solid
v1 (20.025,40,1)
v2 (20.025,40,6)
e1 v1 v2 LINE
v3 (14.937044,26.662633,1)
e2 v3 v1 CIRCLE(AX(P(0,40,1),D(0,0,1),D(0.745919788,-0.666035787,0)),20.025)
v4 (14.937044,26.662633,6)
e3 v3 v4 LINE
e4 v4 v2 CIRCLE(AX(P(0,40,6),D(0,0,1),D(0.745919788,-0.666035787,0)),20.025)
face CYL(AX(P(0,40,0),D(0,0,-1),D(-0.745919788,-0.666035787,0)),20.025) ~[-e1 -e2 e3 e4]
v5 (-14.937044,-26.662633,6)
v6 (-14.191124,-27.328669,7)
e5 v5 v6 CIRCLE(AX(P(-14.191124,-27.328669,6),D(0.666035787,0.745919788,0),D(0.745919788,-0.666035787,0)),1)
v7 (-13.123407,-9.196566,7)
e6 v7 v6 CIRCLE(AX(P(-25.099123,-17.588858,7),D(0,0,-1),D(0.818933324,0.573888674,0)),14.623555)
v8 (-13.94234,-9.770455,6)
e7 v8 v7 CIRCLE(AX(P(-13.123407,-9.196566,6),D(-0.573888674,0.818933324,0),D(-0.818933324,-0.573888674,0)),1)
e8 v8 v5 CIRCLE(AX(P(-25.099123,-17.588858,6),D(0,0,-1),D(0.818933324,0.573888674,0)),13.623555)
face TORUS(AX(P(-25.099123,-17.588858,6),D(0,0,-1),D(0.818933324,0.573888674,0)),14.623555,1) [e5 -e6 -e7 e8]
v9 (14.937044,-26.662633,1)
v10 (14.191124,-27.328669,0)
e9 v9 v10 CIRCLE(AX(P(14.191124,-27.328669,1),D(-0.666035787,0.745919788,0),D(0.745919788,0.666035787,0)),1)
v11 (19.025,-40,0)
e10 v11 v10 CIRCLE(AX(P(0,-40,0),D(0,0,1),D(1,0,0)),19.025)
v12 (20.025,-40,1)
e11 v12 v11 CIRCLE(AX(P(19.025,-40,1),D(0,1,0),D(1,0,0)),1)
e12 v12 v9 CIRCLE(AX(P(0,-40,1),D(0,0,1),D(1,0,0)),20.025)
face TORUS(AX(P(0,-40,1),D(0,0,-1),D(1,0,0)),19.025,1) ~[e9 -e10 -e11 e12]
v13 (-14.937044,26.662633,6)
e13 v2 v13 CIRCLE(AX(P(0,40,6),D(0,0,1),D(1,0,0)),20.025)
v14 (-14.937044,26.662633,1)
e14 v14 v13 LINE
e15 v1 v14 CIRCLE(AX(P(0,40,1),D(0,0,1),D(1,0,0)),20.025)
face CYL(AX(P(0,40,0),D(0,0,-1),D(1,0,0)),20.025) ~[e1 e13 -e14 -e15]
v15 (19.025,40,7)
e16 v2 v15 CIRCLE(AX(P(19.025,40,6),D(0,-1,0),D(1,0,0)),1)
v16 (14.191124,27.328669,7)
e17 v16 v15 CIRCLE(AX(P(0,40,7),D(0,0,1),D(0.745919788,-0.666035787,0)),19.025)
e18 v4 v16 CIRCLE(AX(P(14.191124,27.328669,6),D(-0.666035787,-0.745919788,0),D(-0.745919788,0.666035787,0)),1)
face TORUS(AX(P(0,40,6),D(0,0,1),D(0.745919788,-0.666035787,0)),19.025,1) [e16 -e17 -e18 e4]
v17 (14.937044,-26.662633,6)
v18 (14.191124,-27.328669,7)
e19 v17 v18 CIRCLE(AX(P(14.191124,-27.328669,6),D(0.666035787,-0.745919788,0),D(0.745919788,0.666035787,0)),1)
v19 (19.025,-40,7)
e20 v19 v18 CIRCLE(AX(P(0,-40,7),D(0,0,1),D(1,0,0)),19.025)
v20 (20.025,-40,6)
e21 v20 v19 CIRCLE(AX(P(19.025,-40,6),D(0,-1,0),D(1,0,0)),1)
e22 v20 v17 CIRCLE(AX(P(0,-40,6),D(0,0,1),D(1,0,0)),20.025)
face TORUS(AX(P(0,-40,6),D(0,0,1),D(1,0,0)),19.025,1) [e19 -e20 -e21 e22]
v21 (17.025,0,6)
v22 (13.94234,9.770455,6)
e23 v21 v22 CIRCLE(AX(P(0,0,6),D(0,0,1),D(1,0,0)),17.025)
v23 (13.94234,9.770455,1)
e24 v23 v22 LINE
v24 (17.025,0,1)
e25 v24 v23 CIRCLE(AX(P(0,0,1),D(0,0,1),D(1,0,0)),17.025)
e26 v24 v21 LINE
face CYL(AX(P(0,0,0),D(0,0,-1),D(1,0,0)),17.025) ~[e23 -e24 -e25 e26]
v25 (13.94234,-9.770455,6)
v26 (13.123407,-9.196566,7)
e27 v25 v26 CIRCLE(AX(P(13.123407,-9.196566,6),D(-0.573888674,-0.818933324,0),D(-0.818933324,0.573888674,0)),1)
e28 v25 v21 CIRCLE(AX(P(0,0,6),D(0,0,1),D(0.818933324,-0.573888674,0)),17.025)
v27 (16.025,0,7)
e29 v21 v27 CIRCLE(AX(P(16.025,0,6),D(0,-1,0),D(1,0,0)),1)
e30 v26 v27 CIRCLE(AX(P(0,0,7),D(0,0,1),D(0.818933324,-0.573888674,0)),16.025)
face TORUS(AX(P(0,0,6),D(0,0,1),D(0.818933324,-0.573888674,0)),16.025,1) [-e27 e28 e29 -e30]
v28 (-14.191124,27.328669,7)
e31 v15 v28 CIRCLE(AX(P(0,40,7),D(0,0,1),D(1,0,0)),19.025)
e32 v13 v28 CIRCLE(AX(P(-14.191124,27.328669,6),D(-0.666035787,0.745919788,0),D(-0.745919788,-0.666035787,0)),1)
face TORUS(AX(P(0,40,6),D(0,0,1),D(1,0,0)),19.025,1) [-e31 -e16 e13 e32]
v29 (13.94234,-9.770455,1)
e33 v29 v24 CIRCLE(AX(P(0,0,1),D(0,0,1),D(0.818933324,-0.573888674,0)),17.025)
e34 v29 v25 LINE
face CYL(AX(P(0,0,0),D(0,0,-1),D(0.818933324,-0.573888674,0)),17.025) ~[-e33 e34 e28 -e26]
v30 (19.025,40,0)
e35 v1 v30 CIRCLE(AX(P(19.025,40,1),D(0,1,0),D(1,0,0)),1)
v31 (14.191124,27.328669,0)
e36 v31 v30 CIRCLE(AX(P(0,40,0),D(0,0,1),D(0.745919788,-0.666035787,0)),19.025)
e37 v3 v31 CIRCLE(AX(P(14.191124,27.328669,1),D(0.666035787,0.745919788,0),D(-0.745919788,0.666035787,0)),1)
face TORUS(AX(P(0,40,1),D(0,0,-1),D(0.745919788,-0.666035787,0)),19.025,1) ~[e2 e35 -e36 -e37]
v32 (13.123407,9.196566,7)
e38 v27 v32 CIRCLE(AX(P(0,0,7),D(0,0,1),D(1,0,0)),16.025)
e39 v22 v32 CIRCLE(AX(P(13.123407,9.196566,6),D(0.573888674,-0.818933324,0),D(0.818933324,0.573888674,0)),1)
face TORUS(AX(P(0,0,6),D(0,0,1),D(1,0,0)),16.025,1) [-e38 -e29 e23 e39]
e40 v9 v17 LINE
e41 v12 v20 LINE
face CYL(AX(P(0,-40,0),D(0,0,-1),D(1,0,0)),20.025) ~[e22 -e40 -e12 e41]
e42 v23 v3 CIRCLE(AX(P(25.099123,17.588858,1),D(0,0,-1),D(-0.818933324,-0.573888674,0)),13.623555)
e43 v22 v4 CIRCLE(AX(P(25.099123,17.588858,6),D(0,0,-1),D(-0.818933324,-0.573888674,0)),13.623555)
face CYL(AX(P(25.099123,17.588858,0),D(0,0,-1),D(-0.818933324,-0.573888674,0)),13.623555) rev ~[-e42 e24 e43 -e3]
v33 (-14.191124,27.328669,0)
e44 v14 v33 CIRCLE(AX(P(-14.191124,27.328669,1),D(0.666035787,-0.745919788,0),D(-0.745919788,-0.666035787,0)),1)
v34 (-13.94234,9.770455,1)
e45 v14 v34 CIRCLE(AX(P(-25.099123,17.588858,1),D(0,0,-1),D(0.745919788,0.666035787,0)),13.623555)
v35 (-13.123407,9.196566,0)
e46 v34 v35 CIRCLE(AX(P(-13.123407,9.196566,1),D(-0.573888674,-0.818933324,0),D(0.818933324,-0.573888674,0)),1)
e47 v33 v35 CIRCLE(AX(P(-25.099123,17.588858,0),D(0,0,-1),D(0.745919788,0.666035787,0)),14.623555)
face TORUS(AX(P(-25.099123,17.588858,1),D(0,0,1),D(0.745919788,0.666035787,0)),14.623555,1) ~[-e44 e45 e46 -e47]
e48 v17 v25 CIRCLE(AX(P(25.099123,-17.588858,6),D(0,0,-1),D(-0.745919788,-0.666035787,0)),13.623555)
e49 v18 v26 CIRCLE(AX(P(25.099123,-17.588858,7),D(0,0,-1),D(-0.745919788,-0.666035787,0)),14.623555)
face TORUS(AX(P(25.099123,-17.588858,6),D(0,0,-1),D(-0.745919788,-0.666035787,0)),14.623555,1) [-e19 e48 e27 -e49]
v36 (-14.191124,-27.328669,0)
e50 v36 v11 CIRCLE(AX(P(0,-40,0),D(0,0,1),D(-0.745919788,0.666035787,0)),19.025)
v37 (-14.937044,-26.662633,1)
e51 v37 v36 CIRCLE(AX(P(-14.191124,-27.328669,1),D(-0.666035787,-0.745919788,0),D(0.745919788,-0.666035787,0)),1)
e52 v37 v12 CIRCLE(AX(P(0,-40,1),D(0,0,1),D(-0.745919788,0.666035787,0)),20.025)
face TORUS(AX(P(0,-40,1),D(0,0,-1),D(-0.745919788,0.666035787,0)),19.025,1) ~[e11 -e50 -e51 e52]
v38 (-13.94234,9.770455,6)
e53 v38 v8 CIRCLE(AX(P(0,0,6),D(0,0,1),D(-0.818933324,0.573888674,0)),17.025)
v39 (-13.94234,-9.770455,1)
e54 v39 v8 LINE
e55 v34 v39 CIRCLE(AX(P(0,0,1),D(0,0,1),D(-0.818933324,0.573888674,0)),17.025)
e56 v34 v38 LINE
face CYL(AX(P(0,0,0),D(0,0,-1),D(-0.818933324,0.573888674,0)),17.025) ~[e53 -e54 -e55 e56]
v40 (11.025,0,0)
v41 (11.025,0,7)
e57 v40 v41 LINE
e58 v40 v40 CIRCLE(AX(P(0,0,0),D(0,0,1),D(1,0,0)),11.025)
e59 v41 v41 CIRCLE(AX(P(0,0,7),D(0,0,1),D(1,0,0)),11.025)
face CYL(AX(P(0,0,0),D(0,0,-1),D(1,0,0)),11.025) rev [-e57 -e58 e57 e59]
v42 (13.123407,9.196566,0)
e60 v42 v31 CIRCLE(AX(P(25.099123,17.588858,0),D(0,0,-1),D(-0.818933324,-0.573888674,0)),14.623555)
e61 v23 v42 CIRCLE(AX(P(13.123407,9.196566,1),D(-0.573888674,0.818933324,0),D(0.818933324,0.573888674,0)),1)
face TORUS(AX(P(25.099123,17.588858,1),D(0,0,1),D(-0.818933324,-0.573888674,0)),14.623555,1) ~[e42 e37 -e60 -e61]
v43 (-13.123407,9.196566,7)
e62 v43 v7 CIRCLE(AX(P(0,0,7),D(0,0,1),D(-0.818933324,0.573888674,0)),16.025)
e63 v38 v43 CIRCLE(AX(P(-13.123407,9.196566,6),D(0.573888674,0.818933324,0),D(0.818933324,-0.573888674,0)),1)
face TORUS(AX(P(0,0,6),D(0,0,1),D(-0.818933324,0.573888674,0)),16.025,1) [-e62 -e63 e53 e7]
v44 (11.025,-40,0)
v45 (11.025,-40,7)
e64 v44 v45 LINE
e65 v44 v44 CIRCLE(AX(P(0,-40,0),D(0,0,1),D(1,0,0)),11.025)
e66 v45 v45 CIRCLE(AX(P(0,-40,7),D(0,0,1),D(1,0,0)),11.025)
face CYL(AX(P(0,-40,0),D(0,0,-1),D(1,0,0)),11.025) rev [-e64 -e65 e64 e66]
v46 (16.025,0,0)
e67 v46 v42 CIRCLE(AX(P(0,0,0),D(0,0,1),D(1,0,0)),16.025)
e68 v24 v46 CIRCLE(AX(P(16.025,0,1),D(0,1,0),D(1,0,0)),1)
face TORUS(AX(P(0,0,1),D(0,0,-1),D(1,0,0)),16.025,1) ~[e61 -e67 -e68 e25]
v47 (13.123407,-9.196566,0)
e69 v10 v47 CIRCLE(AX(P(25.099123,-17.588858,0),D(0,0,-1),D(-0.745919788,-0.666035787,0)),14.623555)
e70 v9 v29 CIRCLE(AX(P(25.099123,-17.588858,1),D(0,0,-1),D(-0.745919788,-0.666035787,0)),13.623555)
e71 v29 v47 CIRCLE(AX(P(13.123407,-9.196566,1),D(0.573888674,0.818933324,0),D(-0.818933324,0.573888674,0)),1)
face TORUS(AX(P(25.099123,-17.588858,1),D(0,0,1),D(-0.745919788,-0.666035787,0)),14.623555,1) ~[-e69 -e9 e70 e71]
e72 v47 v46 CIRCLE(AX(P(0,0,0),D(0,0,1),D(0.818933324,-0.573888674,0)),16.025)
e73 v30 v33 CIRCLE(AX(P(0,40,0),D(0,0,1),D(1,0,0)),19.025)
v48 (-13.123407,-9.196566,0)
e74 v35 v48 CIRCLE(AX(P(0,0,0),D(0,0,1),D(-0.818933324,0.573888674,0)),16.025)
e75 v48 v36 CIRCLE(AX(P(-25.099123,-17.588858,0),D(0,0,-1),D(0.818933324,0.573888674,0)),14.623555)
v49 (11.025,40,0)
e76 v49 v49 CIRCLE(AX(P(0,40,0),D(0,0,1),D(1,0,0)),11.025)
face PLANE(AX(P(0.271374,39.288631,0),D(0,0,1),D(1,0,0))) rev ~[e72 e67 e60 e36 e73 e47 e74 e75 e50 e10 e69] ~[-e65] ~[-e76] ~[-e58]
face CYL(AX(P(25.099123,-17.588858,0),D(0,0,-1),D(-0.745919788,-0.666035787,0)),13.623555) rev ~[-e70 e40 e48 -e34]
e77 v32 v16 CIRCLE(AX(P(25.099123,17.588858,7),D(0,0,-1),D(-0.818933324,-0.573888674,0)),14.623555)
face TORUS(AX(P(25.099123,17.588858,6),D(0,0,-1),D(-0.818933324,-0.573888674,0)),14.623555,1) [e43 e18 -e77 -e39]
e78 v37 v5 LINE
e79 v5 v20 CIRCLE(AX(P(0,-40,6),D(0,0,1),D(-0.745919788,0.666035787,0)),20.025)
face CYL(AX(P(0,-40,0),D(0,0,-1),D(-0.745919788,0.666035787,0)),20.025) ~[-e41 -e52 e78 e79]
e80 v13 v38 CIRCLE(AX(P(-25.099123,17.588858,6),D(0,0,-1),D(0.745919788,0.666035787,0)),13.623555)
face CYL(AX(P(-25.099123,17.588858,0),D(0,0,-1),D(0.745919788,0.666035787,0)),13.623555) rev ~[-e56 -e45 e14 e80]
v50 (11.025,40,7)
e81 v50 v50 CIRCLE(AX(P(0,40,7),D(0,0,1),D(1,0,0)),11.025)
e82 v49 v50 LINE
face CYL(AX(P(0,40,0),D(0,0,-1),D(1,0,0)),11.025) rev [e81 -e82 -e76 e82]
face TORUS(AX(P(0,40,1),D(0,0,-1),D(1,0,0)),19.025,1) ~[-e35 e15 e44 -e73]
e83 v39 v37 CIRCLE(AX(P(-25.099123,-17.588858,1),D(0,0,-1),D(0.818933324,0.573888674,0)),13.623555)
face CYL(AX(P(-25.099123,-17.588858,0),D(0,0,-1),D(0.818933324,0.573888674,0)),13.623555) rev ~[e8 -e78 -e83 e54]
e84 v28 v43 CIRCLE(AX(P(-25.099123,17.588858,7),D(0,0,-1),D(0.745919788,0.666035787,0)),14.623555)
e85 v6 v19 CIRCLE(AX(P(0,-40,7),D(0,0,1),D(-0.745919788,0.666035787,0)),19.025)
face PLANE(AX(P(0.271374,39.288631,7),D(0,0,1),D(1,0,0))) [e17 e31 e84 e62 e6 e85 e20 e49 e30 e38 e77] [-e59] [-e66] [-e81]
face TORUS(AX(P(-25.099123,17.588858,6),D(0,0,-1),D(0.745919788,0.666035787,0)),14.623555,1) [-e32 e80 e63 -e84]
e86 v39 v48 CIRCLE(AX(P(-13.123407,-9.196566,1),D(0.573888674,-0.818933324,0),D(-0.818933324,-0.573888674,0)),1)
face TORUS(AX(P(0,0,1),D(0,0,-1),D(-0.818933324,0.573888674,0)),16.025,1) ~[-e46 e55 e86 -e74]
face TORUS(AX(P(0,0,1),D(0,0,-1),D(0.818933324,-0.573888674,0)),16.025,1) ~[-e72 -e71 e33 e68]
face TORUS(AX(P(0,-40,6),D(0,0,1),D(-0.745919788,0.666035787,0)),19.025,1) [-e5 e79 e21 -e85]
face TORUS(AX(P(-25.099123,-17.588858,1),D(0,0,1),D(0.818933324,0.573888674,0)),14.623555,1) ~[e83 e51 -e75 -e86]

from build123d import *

# Parameters (mm, degrees)
F0_R     = 11.025
F1_DEPTH = 7
F2_R     = 1


# Not quite as in the source:
# - a feature names something its author has since deleted; it is built from what else it names


with BuildPart() as f1:
    # F0 (on Top) → F1 (new body)
    with BuildSketch(Plane.XY):
        with BuildLine():
            ThreePointArc((14.9370437515, 26.6626333571), (18.7098226358, 32.8625521411), (20.025, 40))
            ThreePointArc((20.025, 40), (-7.1374478589, 58.7098226358), (-14.9370437515, 26.6626333571))
            ThreePointArc((-14.9370437515, 26.6626333571), (0, 19.975), (14.9370437515, 26.6626333571))
        make_face()
        with Locations((0, 40)):
            Circle(F0_R, mode=Mode.SUBTRACT)
        with BuildLine():
            ThreePointArc((14.9370437515, 26.6626333571), (0, 19.975), (-14.9370437515, 26.6626333571))
            ThreePointArc((-14.9370437515, 26.6626333571), (-11.4991266725, 18.3897005812), (-13.9423398463, 9.7704546778))
            ThreePointArc((-13.9423398463, 9.7704546778), (0, 17.025), (13.9423398463, 9.7704546778))
            ThreePointArc((13.9423398463, 9.7704546778), (11.4991266725, 18.3897005812), (14.9370437515, 26.6626333571))
        make_face()
        with BuildLine():
            ThreePointArc((13.9423398463, 9.7704546778), (0, 17.025), (-13.9423398463, 9.7704546778))
            ThreePointArc((-13.9423398463, 9.7704546778), (-17.025, 0), (-13.9423398463, -9.7704546778))
            ThreePointArc((-13.9423398463, -9.7704546778), (0, -17.025), (13.9423398463, -9.7704546778))
            ThreePointArc((13.9423398463, -9.7704546778), (16.2360549531, -5.1226111075), (17.025, 0))
            ThreePointArc((17.025, 0), (16.2360549531, 5.1226111075), (13.9423398463, 9.7704546778))
        make_face()
        Circle(F0_R, mode=Mode.SUBTRACT)
        with BuildLine():
            ThreePointArc((13.9423398463, -9.7704546778), (0, -17.025), (-13.9423398463, -9.7704546778))
            ThreePointArc((-13.9423398463, -9.7704546778), (-11.4991266725, -18.3897005812), (-14.9370437515, -26.6626333571))
            ThreePointArc((-14.9370437515, -26.6626333571), (0, -19.975), (14.9370437515, -26.6626333571))
            ThreePointArc((14.9370437515, -26.6626333571), (11.4991266725, -18.3897005812), (13.9423398463, -9.7704546778))
        make_face()
        with BuildLine():
            ThreePointArc((14.9370437515, -26.6626333571), (0, -19.975), (-14.9370437515, -26.6626333571))
            ThreePointArc((-14.9370437515, -26.6626333571), (-7.1374478589, -58.7098226358), (20.025, -40))
            ThreePointArc((20.025, -40), (18.7098226358, -32.8625521411), (14.9370437515, -26.6626333571))
        make_face()
        with Locations((0, -40)):
            Circle(F0_R, mode=Mode.SUBTRACT)
    extrude(amount=F1_DEPTH)

    # F2
    f2_edges = [f1.edges().sort_by_distance(p)[0] for p in [
        (14.937044, 26.662633, 3.5),
        (-14.937044, 26.662633, 3.5),
        (0, 60.025, 0),
        (0, 60.025, 7),
        (-13.94234, 9.770455, 3.5),
        (-11.499127, 18.389701, 0),
        (-11.499127, 18.389701, 7),
        (-13.94234, -9.770455, 3.5),
        (-14.937044, -26.662633, 3.5),
        (-11.499127, -18.389701, 0),
        (-11.499127, -18.389701, 7),
        (14.937044, -26.662633, 3.5),
        (0, -60.025, 0),
        (0, -60.025, 7),
    ]]
    fillet(f2_edges, radius=F2_R)


solid = f1.part
